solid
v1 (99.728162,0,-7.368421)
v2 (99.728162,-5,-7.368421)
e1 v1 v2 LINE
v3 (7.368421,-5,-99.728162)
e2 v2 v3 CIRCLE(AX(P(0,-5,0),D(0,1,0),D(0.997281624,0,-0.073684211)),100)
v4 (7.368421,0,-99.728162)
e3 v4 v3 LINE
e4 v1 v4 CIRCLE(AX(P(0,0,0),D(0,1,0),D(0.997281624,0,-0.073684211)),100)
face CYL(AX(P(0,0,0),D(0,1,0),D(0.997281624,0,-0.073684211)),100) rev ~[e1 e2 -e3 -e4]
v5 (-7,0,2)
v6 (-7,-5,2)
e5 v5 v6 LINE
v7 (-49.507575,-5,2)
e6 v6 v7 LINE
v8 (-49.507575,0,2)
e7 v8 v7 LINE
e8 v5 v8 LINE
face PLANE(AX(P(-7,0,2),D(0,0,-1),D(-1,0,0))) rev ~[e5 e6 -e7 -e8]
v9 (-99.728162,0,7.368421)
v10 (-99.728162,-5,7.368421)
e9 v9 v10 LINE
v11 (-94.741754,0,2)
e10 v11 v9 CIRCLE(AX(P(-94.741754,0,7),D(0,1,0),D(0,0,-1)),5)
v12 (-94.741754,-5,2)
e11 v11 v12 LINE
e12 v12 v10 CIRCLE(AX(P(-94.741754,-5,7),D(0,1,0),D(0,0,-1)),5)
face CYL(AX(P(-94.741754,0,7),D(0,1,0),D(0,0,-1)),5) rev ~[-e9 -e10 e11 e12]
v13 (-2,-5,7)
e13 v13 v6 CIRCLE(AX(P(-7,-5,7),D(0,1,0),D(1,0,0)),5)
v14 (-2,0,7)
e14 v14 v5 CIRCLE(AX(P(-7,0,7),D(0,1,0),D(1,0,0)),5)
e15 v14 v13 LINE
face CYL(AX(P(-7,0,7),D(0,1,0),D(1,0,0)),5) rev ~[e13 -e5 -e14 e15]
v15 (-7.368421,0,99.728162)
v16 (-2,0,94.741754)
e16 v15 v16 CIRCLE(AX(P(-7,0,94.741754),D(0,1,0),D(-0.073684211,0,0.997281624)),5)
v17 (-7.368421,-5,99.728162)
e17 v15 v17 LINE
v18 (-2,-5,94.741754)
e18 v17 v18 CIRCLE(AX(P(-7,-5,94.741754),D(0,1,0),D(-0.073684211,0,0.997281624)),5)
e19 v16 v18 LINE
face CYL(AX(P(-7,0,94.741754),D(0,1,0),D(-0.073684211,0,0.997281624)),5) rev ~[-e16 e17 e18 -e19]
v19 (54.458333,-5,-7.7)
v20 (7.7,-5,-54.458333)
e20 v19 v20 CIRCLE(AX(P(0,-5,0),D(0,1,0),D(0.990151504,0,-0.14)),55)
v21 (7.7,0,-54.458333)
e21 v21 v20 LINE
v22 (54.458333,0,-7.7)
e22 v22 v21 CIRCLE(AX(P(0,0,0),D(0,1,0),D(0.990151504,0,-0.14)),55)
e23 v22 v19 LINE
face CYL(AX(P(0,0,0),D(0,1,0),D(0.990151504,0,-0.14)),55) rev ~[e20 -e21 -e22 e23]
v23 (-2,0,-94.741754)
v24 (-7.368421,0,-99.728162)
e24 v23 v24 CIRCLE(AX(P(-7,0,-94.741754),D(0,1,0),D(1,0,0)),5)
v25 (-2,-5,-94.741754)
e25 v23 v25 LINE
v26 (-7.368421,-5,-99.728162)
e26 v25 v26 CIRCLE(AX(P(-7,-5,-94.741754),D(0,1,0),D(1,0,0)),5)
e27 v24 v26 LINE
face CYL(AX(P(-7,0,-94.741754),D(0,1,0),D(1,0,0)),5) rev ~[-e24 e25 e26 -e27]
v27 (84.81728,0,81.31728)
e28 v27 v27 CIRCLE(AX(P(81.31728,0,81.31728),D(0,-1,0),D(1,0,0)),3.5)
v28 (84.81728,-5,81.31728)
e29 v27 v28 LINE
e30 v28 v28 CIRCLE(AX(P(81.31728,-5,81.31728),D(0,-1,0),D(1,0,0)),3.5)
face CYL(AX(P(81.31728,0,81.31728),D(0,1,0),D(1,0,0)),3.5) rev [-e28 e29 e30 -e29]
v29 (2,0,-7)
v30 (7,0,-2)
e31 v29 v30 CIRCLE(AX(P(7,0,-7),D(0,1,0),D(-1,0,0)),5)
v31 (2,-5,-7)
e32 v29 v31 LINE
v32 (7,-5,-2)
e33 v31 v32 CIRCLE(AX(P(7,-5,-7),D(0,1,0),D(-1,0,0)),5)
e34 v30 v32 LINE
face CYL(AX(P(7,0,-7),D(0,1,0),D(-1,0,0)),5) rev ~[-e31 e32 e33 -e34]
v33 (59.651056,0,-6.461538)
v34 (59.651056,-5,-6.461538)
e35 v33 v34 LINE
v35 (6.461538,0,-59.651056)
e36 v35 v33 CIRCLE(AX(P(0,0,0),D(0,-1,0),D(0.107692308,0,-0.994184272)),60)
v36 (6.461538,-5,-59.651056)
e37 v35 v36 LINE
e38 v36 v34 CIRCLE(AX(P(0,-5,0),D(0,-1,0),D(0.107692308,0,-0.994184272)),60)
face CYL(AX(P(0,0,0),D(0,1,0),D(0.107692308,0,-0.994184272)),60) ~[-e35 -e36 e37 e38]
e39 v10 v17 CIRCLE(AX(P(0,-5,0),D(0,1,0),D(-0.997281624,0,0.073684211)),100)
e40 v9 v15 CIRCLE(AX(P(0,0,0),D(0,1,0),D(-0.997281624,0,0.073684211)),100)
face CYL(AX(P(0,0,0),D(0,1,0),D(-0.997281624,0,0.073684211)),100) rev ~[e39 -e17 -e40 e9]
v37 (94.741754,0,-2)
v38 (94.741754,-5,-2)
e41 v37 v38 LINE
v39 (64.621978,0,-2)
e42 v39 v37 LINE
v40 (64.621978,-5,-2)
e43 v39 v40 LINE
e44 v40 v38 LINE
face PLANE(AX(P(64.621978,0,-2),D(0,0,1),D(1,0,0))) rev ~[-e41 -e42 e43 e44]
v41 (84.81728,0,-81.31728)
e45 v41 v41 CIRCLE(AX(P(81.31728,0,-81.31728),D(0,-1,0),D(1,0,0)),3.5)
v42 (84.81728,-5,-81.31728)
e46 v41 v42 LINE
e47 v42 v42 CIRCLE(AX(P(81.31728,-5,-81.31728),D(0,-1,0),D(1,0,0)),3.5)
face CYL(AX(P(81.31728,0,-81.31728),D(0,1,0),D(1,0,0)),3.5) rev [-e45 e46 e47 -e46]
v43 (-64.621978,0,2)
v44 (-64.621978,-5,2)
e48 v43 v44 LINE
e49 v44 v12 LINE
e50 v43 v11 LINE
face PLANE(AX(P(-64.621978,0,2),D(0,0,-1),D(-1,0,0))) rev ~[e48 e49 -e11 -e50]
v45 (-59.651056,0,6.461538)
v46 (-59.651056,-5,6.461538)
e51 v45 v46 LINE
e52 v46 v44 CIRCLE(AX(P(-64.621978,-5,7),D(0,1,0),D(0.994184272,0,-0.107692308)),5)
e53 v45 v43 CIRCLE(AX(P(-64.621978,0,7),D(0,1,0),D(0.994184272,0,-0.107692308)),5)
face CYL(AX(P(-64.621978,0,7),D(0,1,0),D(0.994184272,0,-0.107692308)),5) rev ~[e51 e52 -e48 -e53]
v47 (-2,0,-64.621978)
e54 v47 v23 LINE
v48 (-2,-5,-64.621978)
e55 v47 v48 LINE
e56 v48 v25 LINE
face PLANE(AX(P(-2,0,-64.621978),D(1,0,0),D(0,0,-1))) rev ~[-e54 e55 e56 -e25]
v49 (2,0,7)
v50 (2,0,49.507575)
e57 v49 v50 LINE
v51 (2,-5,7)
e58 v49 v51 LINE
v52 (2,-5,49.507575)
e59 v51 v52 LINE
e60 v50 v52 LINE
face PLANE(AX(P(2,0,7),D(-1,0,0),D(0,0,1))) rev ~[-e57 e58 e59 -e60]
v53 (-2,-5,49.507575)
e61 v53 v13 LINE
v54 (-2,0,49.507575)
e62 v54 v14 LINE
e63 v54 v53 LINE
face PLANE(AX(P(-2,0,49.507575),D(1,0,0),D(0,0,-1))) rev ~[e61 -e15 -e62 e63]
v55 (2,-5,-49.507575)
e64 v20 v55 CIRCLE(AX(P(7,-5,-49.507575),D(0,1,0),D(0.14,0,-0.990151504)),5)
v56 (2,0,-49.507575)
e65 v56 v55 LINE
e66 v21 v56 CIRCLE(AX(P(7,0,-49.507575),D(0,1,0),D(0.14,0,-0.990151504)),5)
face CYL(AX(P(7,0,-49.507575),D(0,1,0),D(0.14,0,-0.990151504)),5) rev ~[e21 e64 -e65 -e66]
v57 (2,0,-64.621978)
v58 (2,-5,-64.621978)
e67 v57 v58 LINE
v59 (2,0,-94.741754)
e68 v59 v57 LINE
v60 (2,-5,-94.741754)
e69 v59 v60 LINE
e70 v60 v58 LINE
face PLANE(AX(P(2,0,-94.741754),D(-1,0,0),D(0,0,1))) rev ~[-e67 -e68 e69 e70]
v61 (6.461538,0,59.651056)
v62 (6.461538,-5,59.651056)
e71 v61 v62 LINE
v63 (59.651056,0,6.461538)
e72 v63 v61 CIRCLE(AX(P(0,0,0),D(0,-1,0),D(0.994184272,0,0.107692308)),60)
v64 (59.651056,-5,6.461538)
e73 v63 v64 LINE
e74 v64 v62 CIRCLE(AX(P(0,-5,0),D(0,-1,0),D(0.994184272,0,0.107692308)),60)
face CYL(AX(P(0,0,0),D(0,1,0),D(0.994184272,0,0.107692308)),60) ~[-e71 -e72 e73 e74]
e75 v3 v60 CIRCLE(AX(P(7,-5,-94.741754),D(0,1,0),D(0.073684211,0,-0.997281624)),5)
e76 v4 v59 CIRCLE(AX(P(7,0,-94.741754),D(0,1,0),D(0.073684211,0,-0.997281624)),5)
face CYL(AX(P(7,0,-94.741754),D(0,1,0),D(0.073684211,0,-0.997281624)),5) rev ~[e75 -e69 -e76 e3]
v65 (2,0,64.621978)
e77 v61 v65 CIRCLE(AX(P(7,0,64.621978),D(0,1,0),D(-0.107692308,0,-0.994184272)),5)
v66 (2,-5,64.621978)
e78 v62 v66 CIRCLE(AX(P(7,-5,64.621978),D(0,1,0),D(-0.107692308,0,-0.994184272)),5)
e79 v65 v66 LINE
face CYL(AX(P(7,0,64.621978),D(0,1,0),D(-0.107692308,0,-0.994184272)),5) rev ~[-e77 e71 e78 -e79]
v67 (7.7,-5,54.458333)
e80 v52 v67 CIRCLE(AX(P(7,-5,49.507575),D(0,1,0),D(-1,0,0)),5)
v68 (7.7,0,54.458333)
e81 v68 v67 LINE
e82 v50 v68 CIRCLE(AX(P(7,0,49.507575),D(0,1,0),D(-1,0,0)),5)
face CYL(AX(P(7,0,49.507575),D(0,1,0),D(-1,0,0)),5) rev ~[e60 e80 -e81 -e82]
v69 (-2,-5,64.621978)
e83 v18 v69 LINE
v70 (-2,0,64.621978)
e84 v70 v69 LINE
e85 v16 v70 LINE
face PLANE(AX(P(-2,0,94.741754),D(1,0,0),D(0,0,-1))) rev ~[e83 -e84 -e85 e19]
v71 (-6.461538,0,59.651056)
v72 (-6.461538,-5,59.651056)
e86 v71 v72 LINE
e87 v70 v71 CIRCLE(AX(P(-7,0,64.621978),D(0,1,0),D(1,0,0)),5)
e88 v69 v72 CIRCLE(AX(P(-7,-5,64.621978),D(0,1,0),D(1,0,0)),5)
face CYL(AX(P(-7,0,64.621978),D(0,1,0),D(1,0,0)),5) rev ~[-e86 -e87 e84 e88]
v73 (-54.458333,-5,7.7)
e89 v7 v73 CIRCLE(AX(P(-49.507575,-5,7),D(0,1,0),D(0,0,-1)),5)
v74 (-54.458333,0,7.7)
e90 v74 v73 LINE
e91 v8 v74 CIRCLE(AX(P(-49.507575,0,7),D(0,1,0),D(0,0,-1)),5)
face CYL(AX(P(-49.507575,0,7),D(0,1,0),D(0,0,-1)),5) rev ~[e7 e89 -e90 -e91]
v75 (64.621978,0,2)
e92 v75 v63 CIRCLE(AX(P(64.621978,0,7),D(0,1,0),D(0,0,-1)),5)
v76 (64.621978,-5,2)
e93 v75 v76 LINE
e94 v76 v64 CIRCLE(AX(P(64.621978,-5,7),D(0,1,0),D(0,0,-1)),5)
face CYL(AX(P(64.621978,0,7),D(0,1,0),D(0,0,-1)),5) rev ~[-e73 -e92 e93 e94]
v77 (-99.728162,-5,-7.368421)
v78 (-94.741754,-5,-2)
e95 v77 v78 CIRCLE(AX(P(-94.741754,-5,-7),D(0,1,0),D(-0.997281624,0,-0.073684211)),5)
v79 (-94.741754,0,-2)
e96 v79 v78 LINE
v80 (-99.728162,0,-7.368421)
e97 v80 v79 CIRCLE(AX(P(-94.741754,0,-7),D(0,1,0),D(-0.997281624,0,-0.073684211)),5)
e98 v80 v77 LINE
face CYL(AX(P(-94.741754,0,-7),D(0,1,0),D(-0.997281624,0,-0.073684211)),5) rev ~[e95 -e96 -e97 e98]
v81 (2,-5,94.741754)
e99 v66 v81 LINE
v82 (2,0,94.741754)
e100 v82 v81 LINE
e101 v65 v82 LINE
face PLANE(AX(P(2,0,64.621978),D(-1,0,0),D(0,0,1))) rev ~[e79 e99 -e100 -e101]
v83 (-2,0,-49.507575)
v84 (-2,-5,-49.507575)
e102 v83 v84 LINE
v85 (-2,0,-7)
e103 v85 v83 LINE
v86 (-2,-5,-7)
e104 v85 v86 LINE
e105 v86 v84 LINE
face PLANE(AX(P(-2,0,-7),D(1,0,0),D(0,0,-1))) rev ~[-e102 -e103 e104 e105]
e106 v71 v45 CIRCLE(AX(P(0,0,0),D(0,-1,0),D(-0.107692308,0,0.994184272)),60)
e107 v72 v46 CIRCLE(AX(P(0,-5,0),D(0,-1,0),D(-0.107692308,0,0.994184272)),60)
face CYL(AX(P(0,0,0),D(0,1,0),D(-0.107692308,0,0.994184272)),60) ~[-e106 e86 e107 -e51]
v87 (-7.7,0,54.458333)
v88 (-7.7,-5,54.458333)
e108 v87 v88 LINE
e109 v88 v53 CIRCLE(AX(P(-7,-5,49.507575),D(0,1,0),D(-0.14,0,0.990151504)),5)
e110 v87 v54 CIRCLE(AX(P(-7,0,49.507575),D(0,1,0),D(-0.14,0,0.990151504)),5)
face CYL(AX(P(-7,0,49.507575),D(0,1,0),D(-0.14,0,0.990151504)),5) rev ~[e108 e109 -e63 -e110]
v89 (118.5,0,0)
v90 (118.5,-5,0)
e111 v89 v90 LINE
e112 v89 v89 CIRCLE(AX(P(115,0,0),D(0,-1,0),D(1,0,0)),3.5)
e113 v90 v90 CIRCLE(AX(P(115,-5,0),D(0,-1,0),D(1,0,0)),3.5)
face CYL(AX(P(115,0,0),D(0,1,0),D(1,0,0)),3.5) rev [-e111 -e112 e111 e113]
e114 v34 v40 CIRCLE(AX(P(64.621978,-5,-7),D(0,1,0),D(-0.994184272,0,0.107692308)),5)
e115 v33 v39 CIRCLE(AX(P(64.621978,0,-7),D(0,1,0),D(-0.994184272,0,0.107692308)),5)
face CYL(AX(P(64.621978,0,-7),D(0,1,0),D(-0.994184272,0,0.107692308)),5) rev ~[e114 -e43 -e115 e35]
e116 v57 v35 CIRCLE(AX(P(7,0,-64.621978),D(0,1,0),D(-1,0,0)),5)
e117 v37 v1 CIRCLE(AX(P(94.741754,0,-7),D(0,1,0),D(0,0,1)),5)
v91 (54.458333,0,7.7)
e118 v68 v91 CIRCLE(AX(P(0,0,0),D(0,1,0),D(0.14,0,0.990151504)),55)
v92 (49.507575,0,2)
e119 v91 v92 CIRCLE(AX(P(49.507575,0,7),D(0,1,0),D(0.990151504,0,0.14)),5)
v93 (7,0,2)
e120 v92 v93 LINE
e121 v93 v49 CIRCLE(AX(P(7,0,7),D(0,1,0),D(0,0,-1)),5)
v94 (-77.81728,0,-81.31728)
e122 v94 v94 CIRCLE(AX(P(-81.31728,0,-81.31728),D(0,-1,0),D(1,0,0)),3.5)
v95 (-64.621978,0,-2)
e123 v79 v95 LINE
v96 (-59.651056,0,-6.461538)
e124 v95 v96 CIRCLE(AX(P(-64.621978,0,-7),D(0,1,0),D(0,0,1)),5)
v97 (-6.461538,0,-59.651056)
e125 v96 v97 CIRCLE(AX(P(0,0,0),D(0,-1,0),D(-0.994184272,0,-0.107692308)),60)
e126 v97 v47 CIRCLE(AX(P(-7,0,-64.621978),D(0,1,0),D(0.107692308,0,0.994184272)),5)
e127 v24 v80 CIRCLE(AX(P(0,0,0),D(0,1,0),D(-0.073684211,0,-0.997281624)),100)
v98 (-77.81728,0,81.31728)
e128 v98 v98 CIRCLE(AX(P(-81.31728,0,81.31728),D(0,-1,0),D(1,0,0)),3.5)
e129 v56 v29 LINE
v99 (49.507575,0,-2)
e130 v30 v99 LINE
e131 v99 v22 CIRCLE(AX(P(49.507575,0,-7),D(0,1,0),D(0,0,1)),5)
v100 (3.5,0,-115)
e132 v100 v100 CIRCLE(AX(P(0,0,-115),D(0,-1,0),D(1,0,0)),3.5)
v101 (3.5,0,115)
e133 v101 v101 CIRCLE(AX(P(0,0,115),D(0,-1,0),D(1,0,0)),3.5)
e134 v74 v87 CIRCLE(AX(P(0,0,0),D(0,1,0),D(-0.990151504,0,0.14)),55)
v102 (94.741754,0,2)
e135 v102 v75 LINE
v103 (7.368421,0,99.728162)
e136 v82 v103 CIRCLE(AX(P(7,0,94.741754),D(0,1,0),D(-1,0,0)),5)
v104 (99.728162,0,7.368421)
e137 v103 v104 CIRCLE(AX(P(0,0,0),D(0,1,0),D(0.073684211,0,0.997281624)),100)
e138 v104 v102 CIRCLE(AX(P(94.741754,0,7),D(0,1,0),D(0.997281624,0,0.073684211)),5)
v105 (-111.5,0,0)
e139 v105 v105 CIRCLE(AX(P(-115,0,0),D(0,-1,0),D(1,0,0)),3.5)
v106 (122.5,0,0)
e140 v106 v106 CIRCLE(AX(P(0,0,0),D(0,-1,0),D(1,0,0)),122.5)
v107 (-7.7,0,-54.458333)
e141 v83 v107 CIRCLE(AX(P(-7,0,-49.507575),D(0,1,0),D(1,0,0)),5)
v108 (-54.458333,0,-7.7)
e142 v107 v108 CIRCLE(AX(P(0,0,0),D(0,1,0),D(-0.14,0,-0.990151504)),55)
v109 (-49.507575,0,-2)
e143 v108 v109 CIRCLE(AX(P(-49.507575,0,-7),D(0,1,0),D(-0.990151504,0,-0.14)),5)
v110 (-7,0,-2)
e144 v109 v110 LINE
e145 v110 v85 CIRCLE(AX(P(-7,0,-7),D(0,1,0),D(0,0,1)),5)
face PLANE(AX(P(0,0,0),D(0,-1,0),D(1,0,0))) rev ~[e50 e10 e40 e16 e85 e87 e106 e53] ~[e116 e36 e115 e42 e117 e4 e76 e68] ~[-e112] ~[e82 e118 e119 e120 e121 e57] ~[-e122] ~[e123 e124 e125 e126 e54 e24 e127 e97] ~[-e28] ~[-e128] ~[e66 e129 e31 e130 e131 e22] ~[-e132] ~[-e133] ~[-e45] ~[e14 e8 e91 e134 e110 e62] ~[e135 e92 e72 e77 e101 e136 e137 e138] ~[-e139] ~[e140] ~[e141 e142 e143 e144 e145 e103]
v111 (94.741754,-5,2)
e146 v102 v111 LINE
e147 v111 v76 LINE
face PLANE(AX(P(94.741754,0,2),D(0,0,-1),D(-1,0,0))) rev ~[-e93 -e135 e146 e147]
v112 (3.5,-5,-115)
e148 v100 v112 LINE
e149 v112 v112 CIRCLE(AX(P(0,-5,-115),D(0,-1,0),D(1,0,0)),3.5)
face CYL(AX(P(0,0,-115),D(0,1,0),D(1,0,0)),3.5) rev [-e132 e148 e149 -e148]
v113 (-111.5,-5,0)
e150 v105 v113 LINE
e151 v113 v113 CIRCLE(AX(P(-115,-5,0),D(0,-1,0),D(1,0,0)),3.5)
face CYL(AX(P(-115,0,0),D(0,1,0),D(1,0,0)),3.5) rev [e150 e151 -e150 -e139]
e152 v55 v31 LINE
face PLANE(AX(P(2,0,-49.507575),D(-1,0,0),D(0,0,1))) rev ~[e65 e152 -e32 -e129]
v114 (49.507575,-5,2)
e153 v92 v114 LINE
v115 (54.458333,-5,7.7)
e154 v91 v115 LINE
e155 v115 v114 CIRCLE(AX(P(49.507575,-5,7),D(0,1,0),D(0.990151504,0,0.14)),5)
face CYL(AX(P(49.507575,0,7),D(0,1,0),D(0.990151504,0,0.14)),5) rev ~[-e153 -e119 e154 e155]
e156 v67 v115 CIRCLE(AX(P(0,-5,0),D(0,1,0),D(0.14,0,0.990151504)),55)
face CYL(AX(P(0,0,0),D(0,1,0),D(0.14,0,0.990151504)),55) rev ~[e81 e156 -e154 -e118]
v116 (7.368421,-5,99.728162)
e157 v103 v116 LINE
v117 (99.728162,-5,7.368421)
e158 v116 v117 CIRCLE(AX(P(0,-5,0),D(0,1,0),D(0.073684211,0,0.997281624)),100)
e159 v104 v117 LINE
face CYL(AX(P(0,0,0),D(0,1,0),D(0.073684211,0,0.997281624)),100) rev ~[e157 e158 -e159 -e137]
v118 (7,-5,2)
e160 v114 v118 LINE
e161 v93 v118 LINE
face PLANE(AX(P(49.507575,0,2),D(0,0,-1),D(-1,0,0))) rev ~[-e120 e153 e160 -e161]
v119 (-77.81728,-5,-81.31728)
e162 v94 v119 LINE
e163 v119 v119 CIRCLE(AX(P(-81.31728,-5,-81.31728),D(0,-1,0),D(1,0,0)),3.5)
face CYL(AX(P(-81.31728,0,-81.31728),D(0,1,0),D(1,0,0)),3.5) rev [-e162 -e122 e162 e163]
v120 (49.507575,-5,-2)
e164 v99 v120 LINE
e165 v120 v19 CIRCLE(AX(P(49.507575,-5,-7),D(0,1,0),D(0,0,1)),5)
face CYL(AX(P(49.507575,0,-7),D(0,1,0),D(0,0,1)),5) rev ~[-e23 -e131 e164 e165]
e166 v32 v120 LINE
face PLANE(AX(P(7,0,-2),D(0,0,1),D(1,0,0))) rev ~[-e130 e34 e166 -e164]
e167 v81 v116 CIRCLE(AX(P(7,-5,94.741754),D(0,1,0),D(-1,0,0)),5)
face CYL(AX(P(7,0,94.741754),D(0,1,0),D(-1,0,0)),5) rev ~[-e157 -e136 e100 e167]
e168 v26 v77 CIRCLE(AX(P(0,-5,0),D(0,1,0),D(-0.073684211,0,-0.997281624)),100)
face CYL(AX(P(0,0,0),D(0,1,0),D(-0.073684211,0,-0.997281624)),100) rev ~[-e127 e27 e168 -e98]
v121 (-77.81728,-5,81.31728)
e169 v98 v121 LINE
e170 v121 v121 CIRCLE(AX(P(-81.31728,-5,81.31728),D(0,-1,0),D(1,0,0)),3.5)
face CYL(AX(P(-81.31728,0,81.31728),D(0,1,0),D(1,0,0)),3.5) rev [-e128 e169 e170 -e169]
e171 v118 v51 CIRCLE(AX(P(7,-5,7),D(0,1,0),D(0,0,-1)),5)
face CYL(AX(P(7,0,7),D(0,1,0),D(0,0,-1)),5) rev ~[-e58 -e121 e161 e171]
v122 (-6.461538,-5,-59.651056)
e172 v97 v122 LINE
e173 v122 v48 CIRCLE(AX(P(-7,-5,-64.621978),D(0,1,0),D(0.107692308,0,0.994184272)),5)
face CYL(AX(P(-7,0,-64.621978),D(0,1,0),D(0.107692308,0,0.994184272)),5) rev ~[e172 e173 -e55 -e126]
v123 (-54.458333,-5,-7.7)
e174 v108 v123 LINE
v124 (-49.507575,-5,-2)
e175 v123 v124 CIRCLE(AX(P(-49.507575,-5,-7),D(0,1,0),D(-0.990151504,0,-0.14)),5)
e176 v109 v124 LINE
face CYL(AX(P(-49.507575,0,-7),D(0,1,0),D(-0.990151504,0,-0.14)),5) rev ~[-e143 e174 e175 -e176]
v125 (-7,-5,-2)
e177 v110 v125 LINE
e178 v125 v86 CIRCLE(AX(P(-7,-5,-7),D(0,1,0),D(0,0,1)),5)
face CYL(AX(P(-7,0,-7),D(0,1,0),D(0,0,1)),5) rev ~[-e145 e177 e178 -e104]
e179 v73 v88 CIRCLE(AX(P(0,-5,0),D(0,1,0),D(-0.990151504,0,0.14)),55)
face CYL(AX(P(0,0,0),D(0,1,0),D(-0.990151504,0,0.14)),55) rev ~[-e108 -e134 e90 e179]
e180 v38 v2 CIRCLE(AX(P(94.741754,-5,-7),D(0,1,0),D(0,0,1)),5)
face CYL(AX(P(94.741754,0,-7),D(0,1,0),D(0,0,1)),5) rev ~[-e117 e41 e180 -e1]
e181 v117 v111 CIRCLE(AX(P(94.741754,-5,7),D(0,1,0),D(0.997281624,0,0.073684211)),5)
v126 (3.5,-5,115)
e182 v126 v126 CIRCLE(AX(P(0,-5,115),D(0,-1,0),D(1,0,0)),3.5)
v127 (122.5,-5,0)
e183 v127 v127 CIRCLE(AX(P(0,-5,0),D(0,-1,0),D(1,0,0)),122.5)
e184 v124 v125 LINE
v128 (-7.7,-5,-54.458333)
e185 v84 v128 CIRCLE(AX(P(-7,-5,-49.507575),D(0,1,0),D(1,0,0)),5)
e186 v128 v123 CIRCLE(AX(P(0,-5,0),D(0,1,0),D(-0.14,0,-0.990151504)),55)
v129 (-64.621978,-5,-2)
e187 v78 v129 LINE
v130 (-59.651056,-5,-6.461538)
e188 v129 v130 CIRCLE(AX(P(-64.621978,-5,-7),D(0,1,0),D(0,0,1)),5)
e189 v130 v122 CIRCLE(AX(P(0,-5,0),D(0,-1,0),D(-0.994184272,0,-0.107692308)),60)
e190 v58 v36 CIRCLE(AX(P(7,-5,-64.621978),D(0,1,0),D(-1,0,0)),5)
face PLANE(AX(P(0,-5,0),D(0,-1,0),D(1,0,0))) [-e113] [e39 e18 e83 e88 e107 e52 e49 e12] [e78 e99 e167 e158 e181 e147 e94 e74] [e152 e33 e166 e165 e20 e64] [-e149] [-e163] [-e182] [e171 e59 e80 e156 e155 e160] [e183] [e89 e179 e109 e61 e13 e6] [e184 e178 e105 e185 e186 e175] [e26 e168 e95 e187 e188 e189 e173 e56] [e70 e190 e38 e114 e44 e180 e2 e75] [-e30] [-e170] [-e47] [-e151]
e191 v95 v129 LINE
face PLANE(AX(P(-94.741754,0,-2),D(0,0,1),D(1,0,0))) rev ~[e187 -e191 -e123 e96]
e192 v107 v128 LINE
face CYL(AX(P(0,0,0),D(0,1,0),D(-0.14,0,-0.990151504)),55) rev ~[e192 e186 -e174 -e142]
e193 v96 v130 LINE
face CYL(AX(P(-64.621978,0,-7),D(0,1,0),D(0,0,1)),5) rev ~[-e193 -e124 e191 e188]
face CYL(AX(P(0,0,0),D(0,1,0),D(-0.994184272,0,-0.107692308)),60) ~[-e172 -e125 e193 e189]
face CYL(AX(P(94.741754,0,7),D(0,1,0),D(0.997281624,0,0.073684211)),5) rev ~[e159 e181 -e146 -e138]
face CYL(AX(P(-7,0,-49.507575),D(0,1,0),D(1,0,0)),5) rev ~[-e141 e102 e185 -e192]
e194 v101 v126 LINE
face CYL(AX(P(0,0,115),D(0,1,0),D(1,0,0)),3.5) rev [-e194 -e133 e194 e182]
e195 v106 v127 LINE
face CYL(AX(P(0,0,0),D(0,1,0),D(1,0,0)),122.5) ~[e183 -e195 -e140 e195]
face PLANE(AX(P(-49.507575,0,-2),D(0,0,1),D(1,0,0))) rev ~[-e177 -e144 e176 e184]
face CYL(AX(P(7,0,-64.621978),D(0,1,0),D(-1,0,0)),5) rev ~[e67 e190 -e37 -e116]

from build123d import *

# Parameters (mm, degrees)
F0_R     = 122.5
F0_R_2   = 3.5
F1_DEPTH = 5


# Not quite as in the source:
# - a feature names something its author has since deleted; it is built from what else it names


with BuildPart() as f1:
    # F0 (on Front) → F1 (new body)
    with BuildSketch(Plane.XZ):
        Circle(F0_R)
        with Locations((-81.3172798365, -81.3172798365)):
            Circle(F0_R_2, mode=Mode.SUBTRACT)
        with BuildLine():
            ThreePointArc((-99.7281623775, -7.3684210526), (-98.4052297439, -3.5972147631), (-94.7417542586, -2))
            Line((-94.7417542586, -2), (-64.6219776856, -2))
            ThreePointArc((-64.6219776856, -2), (-61.2822402478, -3.2789579623), (-59.6510563252, -6.4615384615))
            ThreePointArc((-59.6510563252, -6.4615384615), (-42.4264068712, -42.4264068712), (-6.4615384615, -59.6510563252))
            ThreePointArc((-6.4615384615, -59.6510563252), (-3.2789579623, -61.2822402478), (-2, -64.6219776856))
            Line((-2, -64.6219776856), (-2, -94.7417542586))
            ThreePointArc((-2, -94.7417542586), (-3.5972147631, -98.4052297439), (-7.3684210526, -99.7281623775))
            ThreePointArc((-7.3684210526, -99.7281623775), (-70.7106781187, -70.7106781187), (-99.7281623775, -7.3684210526))
        make_face(mode=Mode.SUBTRACT)
        with BuildLine():
            ThreePointArc((-7, -2), (-3.4644660941, -3.4644660941), (-2, -7))
            Line((-2, -7), (-2, -49.5075751779))
            ThreePointArc((-2, -49.5075751779), (-3.7212807378, -53.2824923956), (-7.7, -54.4583326957))
            ThreePointArc((-7.7, -54.4583326957), (-38.8908729653, -38.8908729653), (-54.4583326957, -7.7))
            ThreePointArc((-54.4583326957, -7.7), (-53.2824923956, -3.7212807378), (-49.5075751779, -2))
            Line((-49.5075751779, -2), (-7, -2))
        make_face(mode=Mode.SUBTRACT)
        with Locations((0, -115)):
            Circle(F0_R_2, mode=Mode.SUBTRACT)
        with Locations((81.3172798365, -81.3172798365)):
            Circle(F0_R_2, mode=Mode.SUBTRACT)
        with BuildLine():
            ThreePointArc((99.7281623775, -7.3684210526), (70.7106781187, -70.7106781187), (7.3684210526, -99.7281623775))
            ThreePointArc((7.3684210526, -99.7281623775), (3.5972147631, -98.4052297439), (2, -94.7417542586))
            Line((2, -94.7417542586), (2, -64.6219776856))
            ThreePointArc((2, -64.6219776856), (3.2789579623, -61.2822402478), (6.4615384615, -59.6510563252))
            ThreePointArc((6.4615384615, -59.6510563252), (42.4264068712, -42.4264068712), (59.6510563252, -6.4615384615))
            ThreePointArc((59.6510563252, -6.4615384615), (61.2822402478, -3.2789579623), (64.6219776856, -2))
            Line((64.6219776856, -2), (94.7417542586, -2))
            ThreePointArc((94.7417542586, -2), (98.4052297439, -3.5972147631), (99.7281623775, -7.3684210526))
        make_face(mode=Mode.SUBTRACT)
        with BuildLine():
            Line((2, -49.5075751779), (2, -7))
            ThreePointArc((2, -7), (3.4644660941, -3.4644660941), (7, -2))
            Line((7, -2), (49.5075751779, -2))
            ThreePointArc((49.5075751779, -2), (53.2824923956, -3.7212807378), (54.4583326957, -7.7))
            ThreePointArc((54.4583326957, -7.7), (38.8908729653, -38.8908729653), (7.7, -54.4583326957))
            ThreePointArc((7.7, -54.4583326957), (3.7212807378, -53.2824923956), (2, -49.5075751779))
        make_face(mode=Mode.SUBTRACT)
        with Locations((-115, 0)):
            Circle(F0_R_2, mode=Mode.SUBTRACT)
        with BuildLine():
            ThreePointArc((-2, 7), (-3.4644660941, 3.4644660941), (-7, 2))
            Line((-7, 2), (-49.5075751779, 2))
            ThreePointArc((-49.5075751779, 2), (-53.2824923956, 3.7212807378), (-54.4583326957, 7.7))
            ThreePointArc((-54.4583326957, 7.7), (-38.8908729653, 38.8908729653), (-7.7, 54.4583326957))
            ThreePointArc((-7.7, 54.4583326957), (-3.7212807378, 53.2824923956), (-2, 49.5075751779))
            Line((-2, 49.5075751779), (-2, 7))
        make_face(mode=Mode.SUBTRACT)
        with BuildLine():
            ThreePointArc((-99.7281623775, 7.3684210526), (-70.7106781187, 70.7106781187), (-7.3684210526, 99.7281623775))
            ThreePointArc((-7.3684210526, 99.7281623775), (-3.5972147631, 98.4052297439), (-2, 94.7417542586))
            Line((-2, 94.7417542586), (-2, 64.6219776856))
            ThreePointArc((-2, 64.6219776856), (-3.2789579623, 61.2822402478), (-6.4615384615, 59.6510563252))
            ThreePointArc((-6.4615384615, 59.6510563252), (-42.4264068712, 42.4264068712), (-59.6510563252, 6.4615384615))
            ThreePointArc((-59.6510563252, 6.4615384615), (-61.2822402478, 3.2789579623), (-64.6219776856, 2))
            Line((-64.6219776856, 2), (-94.7417542586, 2))
            ThreePointArc((-94.7417542586, 2), (-98.4052297439, 3.5972147631), (-99.7281623775, 7.3684210526))
        make_face(mode=Mode.SUBTRACT)
        with Locations((-81.3172798365, 81.3172798365)):
            Circle(F0_R_2, mode=Mode.SUBTRACT)
        with BuildLine():
            Line((49.5075751779, 2), (7, 2))
            ThreePointArc((7, 2), (3.4644660941, 3.4644660941), (2, 7))
            Line((2, 7), (2, 49.5075751779))
            ThreePointArc((2, 49.5075751779), (3.7212807378, 53.2824923956), (7.7, 54.4583326957))
            ThreePointArc((7.7, 54.4583326957), (38.8908729653, 38.8908729653), (54.4583326957, 7.7))
            ThreePointArc((54.4583326957, 7.7), (53.2824923956, 3.7212807378), (49.5075751779, 2))
        make_face(mode=Mode.SUBTRACT)
        with BuildLine():
            Line((2, 64.6219776856), (2, 94.7417542586))
            ThreePointArc((2, 94.7417542586), (3.5972147631, 98.4052297439), (7.3684210526, 99.7281623775))
            ThreePointArc((7.3684210526, 99.7281623775), (70.7106781187, 70.7106781187), (99.7281623775, 7.3684210526))
            ThreePointArc((99.7281623775, 7.3684210526), (98.4052297439, 3.5972147631), (94.7417542586, 2))
            Line((94.7417542586, 2), (64.6219776856, 2))
            ThreePointArc((64.6219776856, 2), (61.2822402478, 3.2789579623), (59.6510563252, 6.4615384615))
            ThreePointArc((59.6510563252, 6.4615384615), (42.4264068712, 42.4264068712), (6.4615384615, 59.6510563252))
            ThreePointArc((6.4615384615, 59.6510563252), (3.2789579623, 61.2822402478), (2, 64.6219776856))
        make_face(mode=Mode.SUBTRACT)
        with Locations((115, 0)):
            Circle(F0_R_2, mode=Mode.SUBTRACT)
        with Locations((0, 115)):
            Circle(F0_R_2, mode=Mode.SUBTRACT)
        with Locations((81.3172798365, 81.3172798365)):
            Circle(F0_R_2, mode=Mode.SUBTRACT)
    extrude(amount=F1_DEPTH)


solid = f1.part
